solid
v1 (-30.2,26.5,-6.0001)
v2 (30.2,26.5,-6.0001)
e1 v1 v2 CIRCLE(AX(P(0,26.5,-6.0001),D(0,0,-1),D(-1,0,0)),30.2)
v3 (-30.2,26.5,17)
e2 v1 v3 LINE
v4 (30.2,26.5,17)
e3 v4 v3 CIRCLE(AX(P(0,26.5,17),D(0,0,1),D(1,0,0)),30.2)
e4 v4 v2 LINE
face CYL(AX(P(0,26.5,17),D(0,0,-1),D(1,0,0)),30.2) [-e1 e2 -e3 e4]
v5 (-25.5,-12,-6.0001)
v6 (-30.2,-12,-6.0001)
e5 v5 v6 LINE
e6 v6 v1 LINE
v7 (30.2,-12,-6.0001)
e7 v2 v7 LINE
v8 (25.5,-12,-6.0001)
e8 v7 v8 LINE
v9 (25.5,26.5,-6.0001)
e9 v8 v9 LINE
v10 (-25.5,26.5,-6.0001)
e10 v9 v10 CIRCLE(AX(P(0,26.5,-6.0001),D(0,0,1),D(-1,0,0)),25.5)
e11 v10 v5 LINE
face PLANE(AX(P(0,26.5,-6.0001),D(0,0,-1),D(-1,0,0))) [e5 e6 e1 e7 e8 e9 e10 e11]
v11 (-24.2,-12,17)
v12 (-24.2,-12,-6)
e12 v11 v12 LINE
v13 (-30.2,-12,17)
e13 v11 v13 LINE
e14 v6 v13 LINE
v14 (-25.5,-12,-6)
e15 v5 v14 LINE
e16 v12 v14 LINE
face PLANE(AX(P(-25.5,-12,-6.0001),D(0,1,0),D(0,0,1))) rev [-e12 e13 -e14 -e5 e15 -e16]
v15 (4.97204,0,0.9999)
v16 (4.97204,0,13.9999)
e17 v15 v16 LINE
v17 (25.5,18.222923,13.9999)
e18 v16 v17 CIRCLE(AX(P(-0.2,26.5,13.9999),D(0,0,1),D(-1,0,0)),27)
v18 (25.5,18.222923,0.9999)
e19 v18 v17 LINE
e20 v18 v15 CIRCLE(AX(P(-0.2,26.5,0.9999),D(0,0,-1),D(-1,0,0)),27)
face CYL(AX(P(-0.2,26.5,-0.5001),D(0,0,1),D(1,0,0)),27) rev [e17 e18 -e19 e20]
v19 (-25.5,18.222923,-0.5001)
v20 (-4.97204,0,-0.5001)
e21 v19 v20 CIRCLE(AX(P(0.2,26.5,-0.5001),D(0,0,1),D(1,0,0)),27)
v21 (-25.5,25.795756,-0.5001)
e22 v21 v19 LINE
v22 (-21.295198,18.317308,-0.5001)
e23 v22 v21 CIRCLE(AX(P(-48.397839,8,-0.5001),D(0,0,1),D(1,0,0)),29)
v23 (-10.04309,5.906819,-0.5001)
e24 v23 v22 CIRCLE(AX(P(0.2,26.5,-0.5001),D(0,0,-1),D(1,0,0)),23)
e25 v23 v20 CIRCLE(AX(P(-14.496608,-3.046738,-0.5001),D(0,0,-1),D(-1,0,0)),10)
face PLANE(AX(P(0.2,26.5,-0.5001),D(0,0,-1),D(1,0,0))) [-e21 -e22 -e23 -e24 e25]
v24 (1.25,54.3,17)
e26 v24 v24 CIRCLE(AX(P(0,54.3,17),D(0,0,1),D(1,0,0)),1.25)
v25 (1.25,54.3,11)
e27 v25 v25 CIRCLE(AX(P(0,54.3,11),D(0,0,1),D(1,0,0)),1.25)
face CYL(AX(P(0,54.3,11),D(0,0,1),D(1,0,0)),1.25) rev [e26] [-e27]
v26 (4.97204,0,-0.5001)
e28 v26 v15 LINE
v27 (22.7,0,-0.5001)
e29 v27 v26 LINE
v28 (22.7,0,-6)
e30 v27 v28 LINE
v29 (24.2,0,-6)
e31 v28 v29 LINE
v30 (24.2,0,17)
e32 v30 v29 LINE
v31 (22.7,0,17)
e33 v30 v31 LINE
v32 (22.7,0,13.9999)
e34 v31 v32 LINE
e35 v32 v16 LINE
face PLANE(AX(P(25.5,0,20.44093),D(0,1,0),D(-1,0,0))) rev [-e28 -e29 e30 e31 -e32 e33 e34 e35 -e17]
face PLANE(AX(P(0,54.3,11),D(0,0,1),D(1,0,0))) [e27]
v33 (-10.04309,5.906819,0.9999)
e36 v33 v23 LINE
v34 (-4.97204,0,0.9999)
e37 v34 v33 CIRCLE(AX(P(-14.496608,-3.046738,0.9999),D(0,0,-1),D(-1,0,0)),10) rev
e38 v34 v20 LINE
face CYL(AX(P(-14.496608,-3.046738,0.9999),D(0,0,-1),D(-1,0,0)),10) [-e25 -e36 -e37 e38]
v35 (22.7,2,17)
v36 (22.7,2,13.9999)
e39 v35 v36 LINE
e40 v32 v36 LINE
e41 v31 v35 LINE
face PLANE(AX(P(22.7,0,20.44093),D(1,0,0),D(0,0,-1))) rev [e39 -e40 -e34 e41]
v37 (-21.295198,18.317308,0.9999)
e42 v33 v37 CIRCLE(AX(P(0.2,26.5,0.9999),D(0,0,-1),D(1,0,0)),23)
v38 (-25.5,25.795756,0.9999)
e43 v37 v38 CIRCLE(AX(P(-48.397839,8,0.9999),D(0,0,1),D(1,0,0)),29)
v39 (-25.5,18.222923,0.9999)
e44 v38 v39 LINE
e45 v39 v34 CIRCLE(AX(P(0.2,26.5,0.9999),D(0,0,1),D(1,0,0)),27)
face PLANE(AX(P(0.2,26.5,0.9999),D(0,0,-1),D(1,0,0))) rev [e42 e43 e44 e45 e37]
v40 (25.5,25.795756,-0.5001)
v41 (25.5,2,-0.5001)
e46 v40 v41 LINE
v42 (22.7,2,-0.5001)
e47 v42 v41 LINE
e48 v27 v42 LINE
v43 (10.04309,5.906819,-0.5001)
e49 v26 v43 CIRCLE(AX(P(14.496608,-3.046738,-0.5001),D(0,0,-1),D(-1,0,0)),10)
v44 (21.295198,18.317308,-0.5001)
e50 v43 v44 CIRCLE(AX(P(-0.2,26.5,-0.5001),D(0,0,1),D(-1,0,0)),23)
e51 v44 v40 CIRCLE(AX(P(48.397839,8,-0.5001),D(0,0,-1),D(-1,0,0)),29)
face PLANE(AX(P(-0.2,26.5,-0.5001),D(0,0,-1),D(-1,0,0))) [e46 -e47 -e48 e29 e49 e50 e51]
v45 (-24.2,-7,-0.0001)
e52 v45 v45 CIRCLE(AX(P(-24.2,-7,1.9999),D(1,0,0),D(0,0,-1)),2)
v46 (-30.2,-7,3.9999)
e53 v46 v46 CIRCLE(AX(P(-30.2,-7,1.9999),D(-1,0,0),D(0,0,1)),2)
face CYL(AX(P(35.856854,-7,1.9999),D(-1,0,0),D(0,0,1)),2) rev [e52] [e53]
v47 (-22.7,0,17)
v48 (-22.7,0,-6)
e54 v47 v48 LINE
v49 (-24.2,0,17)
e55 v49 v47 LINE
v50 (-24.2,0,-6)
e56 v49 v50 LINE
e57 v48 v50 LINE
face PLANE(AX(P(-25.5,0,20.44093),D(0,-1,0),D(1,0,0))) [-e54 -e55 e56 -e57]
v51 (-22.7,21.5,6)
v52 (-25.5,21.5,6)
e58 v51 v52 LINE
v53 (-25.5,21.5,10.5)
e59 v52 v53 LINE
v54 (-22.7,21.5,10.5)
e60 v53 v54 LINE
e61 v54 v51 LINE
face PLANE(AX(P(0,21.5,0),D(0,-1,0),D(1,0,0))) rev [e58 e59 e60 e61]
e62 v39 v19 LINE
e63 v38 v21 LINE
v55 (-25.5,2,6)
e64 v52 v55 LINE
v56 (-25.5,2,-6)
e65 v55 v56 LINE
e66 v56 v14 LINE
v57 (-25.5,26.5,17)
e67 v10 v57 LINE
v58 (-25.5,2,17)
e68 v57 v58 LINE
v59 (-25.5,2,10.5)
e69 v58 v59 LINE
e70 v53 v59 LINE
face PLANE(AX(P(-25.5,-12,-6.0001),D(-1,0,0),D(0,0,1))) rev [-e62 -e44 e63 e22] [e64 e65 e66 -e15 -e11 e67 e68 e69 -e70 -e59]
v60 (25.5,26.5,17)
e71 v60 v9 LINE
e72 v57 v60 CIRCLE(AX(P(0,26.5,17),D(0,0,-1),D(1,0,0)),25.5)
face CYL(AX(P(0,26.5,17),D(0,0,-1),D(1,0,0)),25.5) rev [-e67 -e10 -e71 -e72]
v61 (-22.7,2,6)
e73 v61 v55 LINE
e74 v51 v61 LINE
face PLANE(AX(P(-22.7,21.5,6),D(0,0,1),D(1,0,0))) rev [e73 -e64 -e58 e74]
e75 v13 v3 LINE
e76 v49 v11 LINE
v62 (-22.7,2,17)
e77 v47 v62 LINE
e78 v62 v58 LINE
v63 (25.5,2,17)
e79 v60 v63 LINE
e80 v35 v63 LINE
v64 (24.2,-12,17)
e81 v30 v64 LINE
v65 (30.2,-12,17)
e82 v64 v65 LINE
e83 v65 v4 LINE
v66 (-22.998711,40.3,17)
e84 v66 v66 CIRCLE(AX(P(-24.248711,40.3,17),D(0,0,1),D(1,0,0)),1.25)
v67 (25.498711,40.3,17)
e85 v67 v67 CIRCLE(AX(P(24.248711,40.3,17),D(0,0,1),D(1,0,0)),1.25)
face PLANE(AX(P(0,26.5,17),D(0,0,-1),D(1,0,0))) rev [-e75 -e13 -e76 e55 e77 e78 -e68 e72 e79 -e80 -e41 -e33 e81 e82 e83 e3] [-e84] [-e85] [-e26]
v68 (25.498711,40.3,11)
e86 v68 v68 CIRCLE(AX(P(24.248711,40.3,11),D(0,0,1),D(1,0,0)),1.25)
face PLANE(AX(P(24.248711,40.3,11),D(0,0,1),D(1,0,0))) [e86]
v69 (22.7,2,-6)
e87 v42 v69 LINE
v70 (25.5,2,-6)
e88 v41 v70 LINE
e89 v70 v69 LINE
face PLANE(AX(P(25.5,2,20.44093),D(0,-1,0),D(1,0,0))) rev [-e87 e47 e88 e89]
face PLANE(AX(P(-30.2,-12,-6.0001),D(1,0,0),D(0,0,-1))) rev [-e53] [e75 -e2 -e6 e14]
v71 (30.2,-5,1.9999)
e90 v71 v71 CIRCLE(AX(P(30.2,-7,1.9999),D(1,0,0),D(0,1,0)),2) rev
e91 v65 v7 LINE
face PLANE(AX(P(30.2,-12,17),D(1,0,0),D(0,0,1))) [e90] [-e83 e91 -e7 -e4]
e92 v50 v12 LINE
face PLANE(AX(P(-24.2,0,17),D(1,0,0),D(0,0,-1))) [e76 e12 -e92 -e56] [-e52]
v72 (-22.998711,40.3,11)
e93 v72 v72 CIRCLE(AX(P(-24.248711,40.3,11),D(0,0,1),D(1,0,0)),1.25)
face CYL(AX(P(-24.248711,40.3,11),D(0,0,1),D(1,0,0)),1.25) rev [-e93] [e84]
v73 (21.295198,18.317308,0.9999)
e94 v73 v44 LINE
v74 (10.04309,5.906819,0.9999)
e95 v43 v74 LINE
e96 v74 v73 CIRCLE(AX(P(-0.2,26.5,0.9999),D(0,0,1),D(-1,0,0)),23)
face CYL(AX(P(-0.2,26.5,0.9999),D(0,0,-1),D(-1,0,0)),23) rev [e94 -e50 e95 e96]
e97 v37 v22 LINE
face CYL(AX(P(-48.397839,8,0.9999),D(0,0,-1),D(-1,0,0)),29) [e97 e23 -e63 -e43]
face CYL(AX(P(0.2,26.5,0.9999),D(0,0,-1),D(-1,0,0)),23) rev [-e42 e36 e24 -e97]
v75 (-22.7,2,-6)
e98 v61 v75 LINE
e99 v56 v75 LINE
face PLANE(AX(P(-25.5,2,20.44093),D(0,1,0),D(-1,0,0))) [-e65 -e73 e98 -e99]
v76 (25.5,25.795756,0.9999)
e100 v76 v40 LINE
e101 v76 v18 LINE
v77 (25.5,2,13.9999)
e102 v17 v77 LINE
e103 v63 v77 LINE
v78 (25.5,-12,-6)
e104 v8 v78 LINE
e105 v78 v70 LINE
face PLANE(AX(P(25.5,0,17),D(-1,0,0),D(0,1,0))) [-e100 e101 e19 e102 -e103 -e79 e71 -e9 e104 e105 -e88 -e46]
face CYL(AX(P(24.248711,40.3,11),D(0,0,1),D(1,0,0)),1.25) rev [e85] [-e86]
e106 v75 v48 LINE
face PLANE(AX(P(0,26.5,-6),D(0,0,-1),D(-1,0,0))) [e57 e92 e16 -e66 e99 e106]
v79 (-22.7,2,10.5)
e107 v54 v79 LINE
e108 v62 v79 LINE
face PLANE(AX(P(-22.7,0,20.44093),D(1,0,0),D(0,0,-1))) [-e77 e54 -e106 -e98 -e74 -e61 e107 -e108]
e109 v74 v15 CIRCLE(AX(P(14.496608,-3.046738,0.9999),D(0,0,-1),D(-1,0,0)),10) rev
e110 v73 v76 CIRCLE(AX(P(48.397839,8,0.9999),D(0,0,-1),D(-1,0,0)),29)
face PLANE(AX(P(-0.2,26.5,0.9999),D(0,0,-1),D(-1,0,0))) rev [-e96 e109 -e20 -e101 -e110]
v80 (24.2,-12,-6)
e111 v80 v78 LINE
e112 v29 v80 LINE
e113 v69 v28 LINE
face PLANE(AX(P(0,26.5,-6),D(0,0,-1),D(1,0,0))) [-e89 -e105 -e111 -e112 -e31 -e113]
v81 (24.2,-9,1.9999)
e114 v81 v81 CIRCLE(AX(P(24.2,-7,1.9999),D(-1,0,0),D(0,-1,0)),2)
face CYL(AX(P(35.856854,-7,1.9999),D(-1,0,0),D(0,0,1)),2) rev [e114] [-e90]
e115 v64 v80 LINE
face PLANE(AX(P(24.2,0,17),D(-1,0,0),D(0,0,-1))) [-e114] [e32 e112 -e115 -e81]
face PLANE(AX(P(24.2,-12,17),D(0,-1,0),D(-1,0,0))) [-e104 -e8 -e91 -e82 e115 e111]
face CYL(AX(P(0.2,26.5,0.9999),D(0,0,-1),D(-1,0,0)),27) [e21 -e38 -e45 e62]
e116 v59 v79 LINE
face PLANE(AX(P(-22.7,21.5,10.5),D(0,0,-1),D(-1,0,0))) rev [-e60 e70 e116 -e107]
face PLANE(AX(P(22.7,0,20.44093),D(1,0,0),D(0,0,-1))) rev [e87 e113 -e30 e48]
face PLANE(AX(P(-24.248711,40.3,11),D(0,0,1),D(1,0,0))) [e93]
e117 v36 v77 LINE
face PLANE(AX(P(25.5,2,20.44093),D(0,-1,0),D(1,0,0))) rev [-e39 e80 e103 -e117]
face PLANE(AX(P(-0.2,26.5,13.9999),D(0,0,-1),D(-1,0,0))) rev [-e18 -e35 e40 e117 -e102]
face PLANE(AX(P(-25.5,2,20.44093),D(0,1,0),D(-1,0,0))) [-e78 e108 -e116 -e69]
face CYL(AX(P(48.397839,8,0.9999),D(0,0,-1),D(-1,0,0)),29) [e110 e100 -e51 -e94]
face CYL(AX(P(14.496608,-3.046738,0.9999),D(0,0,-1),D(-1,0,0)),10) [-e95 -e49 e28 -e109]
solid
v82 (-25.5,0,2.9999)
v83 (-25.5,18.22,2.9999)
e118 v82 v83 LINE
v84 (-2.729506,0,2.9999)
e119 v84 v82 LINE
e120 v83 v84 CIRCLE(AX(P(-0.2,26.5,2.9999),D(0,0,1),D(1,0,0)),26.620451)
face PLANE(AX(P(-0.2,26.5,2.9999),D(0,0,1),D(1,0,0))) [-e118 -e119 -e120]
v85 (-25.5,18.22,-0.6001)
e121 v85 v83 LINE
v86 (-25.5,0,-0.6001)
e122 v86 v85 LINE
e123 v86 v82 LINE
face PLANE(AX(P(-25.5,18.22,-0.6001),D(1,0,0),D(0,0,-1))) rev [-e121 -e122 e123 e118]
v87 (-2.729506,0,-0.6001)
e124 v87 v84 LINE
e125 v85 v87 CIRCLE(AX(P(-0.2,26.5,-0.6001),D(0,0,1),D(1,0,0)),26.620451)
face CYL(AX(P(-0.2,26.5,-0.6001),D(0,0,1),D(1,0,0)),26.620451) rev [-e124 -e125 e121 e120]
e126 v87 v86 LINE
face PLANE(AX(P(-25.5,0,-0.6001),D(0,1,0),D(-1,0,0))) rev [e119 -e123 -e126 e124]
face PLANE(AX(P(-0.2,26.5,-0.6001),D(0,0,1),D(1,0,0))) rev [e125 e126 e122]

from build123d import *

# Parameters (mm, degrees)
BOSS_EXTRUDE1_DEPTH      = 8
BOSS_EXTRUDE2_DEPTH      = 6
BOSS_EXTRUDE2_DEPTH_BACK = 17
BOSS_EXTRUDE3_START      = 0.0001
BOSS_EXTRUDE3_DEPTH      = 0.0001
SKETCH6_W                = 6
SKETCH6_H                = 10
BOSS_EXTRUDE4_DEPTH      = 15
CUT_EXTRUDE6_START       = -10
CUT_EXTRUDE6_DEPTH       = 10
CUT_EXTRUDE1_REACH       = 90.809
SKETCH3_R                = 2
SKETCH9_W                = 2.8
SKETCH9_H                = 2
BOSS_EXTRUDE5_DEPTH      = 23
SKETCH10_W               = 3
SKETCH10_H               = 10
CUT_EXTRUDE7_DEPTH       = 15
SKETCH11_W               = 15
SKETCH11_H               = 10
CUT_EXTRUDE8_DEPTH       = 65
SKETCH15_W               = 2.8
SKETCH15_H               = 4.5
BOSS_EXTRUDE7_DEPTH      = 19.5
BOSS_EXTRUDE8_START      = -20
BOSS_EXTRUDE8_DEPTH      = 14.5
BOSS_EXTRUDE11_START     = -9
BOSS_EXTRUDE11_DEPTH     = 3.6
SKETCH19_R               = 1.25
CUT_EXTRUDE11_DEPTH      = 6
BOSS_EXTRUDE12_DEPTH     = 1.5
FILLET3_R                = 10
FILLET3_OF_MIRROR7_R     = 10


with BuildPart() as part:
    # Sketch1 → Boss-Extrude1 (new body)
    with BuildSketch(Plane.XY):
        with BuildLine():
            Line((22.5, 0), (22.5, 26.5))
            ThreePointArc((22.5, 26.5), (15.909902577, 42.409902577), (0, 49))
            Line((0, 49), (0, 52))
            ThreePointArc((0, 52), (18.03122292, 44.53122292), (25.5, 26.5))
            Line((25.5, 26.5), (25.5, 0))
            Line((25.5, 0), (22.5, 0))
        make_face()
    boss_extrude1 = extrude(amount=BOSS_EXTRUDE1_DEPTH)

    # Mirror1: Boss-Extrude1 across plane
    add(boss_extrude1.mirror(Plane(origin=(0, 52, 8), x_dir=(0, 0, 1), z_dir=(1, 0, 0))))

    # Sketch7 → Cut-Extrude6 (cut)
    with BuildSketch(Plane.XY.offset(8).offset(CUT_EXTRUDE6_START)):
        with BuildLine():
            Line((-22.5, 26.5), (-22.5, 18.310669729))
            Line((-22.5, 18.310669729), (-22.5, -2))
            Line((-22.5, -2), (-25.5, -2))
            Line((-25.5, -2), (-25.5, 18.310669729))
            Line((-25.5, 18.310669729), (-25.5, 26.5))
            ThreePointArc((-25.5, 26.5), (0, 52), (25.5, 26.5))
            Line((25.5, 26.5), (25.5, 0))
            Line((25.5, 0), (22.5, 0))
            Line((22.5, 0), (22.5, 26.5))
            ThreePointArc((22.5, 26.5), (0, 49), (-22.5, 26.5))
        make_face()
    extrude(amount=CUT_EXTRUDE6_DEPTH, mode=Mode.SUBTRACT)


with BuildPart() as body_2:
    # Sketch2 → Boss-Extrude2 (new, two sides: drawn at the far end of the back side and taken through both)
    with BuildSketch(Plane(origin=(0, 0, 0), x_dir=(-1, 0, 0), z_dir=(0, 0, -1)).offset(-BOSS_EXTRUDE2_DEPTH_BACK)):
        with BuildLine():
            Line((24.2, 0), (24.2, -12))
            Line((24.2, -12), (30.2, -12))
            Line((30.2, -12), (30.2, 26.5))
            ThreePointArc((30.2, 26.5), (21.354624792, 47.854624792), (0, 56.7))
            Line((0, 56.7), (0, 52))
            ThreePointArc((0, 52), (18.03122292, 44.53122292), (25.5, 26.5))
            Line((25.5, 26.5), (25.5, 0))
            Line((25.5, 0), (24.2, 0))
        make_face()
    extrude(amount=BOSS_EXTRUDE2_DEPTH + BOSS_EXTRUDE2_DEPTH_BACK)


with BuildPart() as body_3:
    # Mirror3: mirrored copy
    add(body_2.part.mirror(Plane(origin=(0, 56.7, 17), x_dir=(0, 0, 1), z_dir=(1, 0, 0))))


with BuildPart() as body_2_1:
    add(body_2.part)

    add(body_3.part)  # Boss-Extrude3 merges body 3
    # Sketch5 → Boss-Extrude3 (add)
    with BuildSketch(Plane(origin=(0, 0, -6), x_dir=(-1, 0, 0), z_dir=(0, 0, -1)).offset(BOSS_EXTRUDE3_START)):
        with BuildLine():
            Line((25.5, -12), (25.5, 26.5))
            ThreePointArc((25.5, 26.5), (0, 52), (-25.5, 26.5))
            Line((-25.5, 26.5), (-25.5, -12))
            Line((-25.5, -12), (-30.2, -12))
            Line((-30.2, -12), (-30.2, 26.5))
            ThreePointArc((-30.2, 26.5), (0, 56.7), (30.2, 26.5))
            Line((30.2, 26.5), (30.2, -12))
            Line((30.2, -12), (25.5, -12))
        make_face()
    extrude(amount=-BOSS_EXTRUDE3_DEPTH)

    # Sketch6 → Boss-Extrude4 (add)
    with BuildSketch(Plane.XY.offset(17)):
        with Locations((-27.2, -7)):
            Rectangle(SKETCH6_W, SKETCH6_H)
    boss_extrude4 = extrude(amount=BOSS_EXTRUDE4_DEPTH)

    # Mirror4: Boss-Extrude4 across plane
    add(boss_extrude4.mirror(Plane(origin=(0, 0, 0), x_dir=(0, 0, 1), z_dir=(1, 0, 0))))

    # Mirror5: Boss-Extrude4 across plane
    add(boss_extrude4.mirror(Plane(origin=(0, 0, 0), x_dir=(0, 0, 1), z_dir=(1, 0, 0))))

    # Sketch3 → Cut-Extrude1 (cut, up to next)
    with BuildSketch(Plane.ZY.offset(30.2), mode=Mode.PRIVATE) as cut_extrude1_sk1:
        with Locations((29.9999, -7)):
            Circle(SKETCH3_R)
    cut_extrude1_tool1 = extrude(cut_extrude1_sk1.sketch, amount=-CUT_EXTRUDE1_REACH, mode=Mode.PRIVATE) & body_2_1.part
    # Sketch3 → Cut-Extrude1 (cut, up to next)
    with BuildSketch(Plane.ZY.offset(30.2), mode=Mode.PRIVATE) as cut_extrude1_sk2:
        with Locations((1.9999, -7)):
            Circle(SKETCH3_R)
    cut_extrude1_tool2 = extrude(cut_extrude1_sk2.sketch, amount=-CUT_EXTRUDE1_REACH, mode=Mode.PRIVATE) & body_2_1.part
    add(cut_extrude1_tool1.solids().sort_by_distance((-30.2, -7, 29.9999))[0], mode=Mode.SUBTRACT)
    add(cut_extrude1_tool1.solids().sort_by_distance((-30.2, -7, 29.9999))[1], mode=Mode.SUBTRACT)
    add(cut_extrude1_tool2.solids().sort_by_distance((-30.2, -7, 1.9999))[0], mode=Mode.SUBTRACT)
    add(cut_extrude1_tool2.solids().sort_by_distance((-30.2, -7, 1.9999))[1], mode=Mode.SUBTRACT)

    # Sketch9 → Boss-Extrude5 (add)
    with BuildSketch(Plane(origin=(0, 0, -6), x_dir=(-1, 0, 0), z_dir=(0, 0, -1))):
        with Locations((24.1, 1)):
            Rectangle(SKETCH9_W, SKETCH9_H)
    boss_extrude5 = extrude(amount=-BOSS_EXTRUDE5_DEPTH)

    # Mirror6: Boss-Extrude5 across plane
    add(boss_extrude5.mirror(Plane(origin=(0, 0, 0), x_dir=(0, 0, 1), z_dir=(1, 0, 0))))

    # Sketch10 → Cut-Extrude7 (cut)
    with BuildSketch(Plane.XY.offset(32)):
        with Locations((25.7, -7)):
            Rectangle(SKETCH10_W, SKETCH10_H)
    extrude(amount=-CUT_EXTRUDE7_DEPTH, mode=Mode.SUBTRACT)

    # Sketch11 → Cut-Extrude8 (cut)
    with BuildSketch(Plane.ZY.offset(30.2)):
        with Locations((24.5, -7)):
            Rectangle(SKETCH11_W, SKETCH11_H)
    extrude(amount=-CUT_EXTRUDE8_DEPTH, mode=Mode.SUBTRACT)

    # Sketch15 → Boss-Extrude7 (add)
    with BuildSketch(Plane(origin=(0, 2, 0), x_dir=(1, 0, 0), z_dir=(0, 1, 0))):
        with Locations((-24.1, -8.25)):
            Rectangle(SKETCH15_W, SKETCH15_H)
    extrude(amount=BOSS_EXTRUDE7_DEPTH)

    # Sketch16 → Boss-Extrude8 (add)
    with BuildSketch(Plane(origin=(0, 0, -6.0001), x_dir=(-1, 0, 0), z_dir=(0, 0, -1)).offset(BOSS_EXTRUDE8_START)):
        with BuildLine():
            Line((-25.5, 0), (-4.972040216, 0))
            ThreePointArc((-4.972040216, 0), (-17.724548794, 6.308156337), (-25.5, 18.222923222))
            Line((-25.5, 18.222923222), (-25.5, 0))
        make_face()
    extrude(amount=BOSS_EXTRUDE8_DEPTH)

    # Sketch19 → Cut-Extrude11 (cut)
    with BuildSketch(Plane.XY.offset(17)):
        with Locations((0, 54.3)):
            Circle(SKETCH19_R)
        with Locations((24.248711306, 40.3)):
            Circle(SKETCH19_R)
        with Locations((-24.248711306, 40.3)):
            Circle(SKETCH19_R)
    extrude(amount=-CUT_EXTRUDE11_DEPTH, mode=Mode.SUBTRACT)

    # Sketch21 → Boss-Extrude12 (add)
    with BuildSketch(Plane(origin=(0, 0, -0.5001), x_dir=(-1, 0, 0), z_dir=(0, 0, -1))):
        with BuildLine():
            Line((-25.5, 25.795756465), (-25.5, 18.222923222))
            ThreePointArc((-25.5, 18.222923222), (-17.724548794, 6.308156337), (-4.972040216, 0))
            Line((-4.972040216, 0), (-4.972040216, 4.089065169))
            ThreePointArc((-4.972040216, 4.089065169), (-14.912780115, 9.162068255), (-21.295198222, 18.317307692))
            ThreePointArc((-21.295198222, 18.317307692), (-23.119512448, 22.212887939), (-25.5, 25.795756465))
        make_face()
    boss_extrude12 = extrude(amount=-BOSS_EXTRUDE12_DEPTH)

    # Fillet3
    # the kernel refuses this fillet: 10 mm, written as the material it takes off along each edge
    with BuildSketch(Plane(origin=(4.972040216, 4.089065169, -13.967602165), x_dir=(0.9413494118920093, 0.33743337821052655, 0), z_dir=(0, 0, 1))) as fillet3_piece_1:
        with BuildLine():
            CenterArc((6.558088011, -9.931191011), FILLET3_R, 96.725267466, 45.815614847)
            Line((-1.379787074, -3.849239092), (-1.538544575, -3.727600054))
            ThreePointArc((-1.538544575, -3.727600054), (-0.878163419, -1.85713287), (-0.188269882, 0.067486676))
            Line((-0.188269882, 0.067486676), (0.023421743, 0.19862382))
            ThreePointArc((0.023421743, 0.19862382), (2.693500433, 0.041739326), (5.363579123, 0.19862382))
            Line((5.363579123, 0.19862382), (5.387000866, 0))
        make_face()
    extrude(amount=28.435004329, mode=Mode.SUBTRACT)

    # Mirror7: Boss-Extrude12 across plane
    add(boss_extrude12.mirror(Plane(origin=(0, 0, 0), x_dir=(0, 0, 1), z_dir=(1, 0, 0))))

    # Fillet3 of Mirror7
    # the kernel refuses this fillet: 10 mm, written as the material it takes off along each edge
    with BuildSketch(Plane(origin=(-4.972040216, 4.089065169, -13.967602165), x_dir=(0, -1, 0), z_dir=(0, 0, 1))) as fillet3_of_mirror7_piece_1:
        with BuildLine():
            CenterArc((7.135803026, -9.524567624), FILLET3_OF_MIRROR7_R, 107.738539154, 45.815614847)
            Line((-1.817753901, -5.071050097), (-1.996825039, -4.981979746))
            ThreePointArc((-1.996825039, -4.981979746), (-0.94816824, -2.521440807), (-0.194877694, 0.044974263))
            Line((-0.194877694, 0.044974263), (0, 0.2))
            ThreePointArc((0, 0.2), (2.044532584, 0.2), (4.028130412, 0.190491352))
            Line((4.028130412, 0.190491352), (4.089065169, 0))
        make_face()
    extrude(amount=28.435004329, mode=Mode.SUBTRACT)


with BuildPart() as body_2_2:
    # Sketch18 → Boss-Extrude11 (new body)
    with BuildSketch(Plane(origin=(0, 0, -6.0001), x_dir=(-1, 0, 0), z_dir=(0, 0, -1)).offset(BOSS_EXTRUDE11_START)):
        with BuildLine():
            Line((25.5, 18.22), (25.5, 0))
            Line((25.5, 0), (2.729505874, 0))
            ThreePointArc((2.729505874, 0), (16.83167007, 5.714525488), (25.5, 18.22))
        make_face()
    extrude(amount=BOSS_EXTRUDE11_DEPTH)


solid = Compound([body_2_1.part, body_2_2.part])
